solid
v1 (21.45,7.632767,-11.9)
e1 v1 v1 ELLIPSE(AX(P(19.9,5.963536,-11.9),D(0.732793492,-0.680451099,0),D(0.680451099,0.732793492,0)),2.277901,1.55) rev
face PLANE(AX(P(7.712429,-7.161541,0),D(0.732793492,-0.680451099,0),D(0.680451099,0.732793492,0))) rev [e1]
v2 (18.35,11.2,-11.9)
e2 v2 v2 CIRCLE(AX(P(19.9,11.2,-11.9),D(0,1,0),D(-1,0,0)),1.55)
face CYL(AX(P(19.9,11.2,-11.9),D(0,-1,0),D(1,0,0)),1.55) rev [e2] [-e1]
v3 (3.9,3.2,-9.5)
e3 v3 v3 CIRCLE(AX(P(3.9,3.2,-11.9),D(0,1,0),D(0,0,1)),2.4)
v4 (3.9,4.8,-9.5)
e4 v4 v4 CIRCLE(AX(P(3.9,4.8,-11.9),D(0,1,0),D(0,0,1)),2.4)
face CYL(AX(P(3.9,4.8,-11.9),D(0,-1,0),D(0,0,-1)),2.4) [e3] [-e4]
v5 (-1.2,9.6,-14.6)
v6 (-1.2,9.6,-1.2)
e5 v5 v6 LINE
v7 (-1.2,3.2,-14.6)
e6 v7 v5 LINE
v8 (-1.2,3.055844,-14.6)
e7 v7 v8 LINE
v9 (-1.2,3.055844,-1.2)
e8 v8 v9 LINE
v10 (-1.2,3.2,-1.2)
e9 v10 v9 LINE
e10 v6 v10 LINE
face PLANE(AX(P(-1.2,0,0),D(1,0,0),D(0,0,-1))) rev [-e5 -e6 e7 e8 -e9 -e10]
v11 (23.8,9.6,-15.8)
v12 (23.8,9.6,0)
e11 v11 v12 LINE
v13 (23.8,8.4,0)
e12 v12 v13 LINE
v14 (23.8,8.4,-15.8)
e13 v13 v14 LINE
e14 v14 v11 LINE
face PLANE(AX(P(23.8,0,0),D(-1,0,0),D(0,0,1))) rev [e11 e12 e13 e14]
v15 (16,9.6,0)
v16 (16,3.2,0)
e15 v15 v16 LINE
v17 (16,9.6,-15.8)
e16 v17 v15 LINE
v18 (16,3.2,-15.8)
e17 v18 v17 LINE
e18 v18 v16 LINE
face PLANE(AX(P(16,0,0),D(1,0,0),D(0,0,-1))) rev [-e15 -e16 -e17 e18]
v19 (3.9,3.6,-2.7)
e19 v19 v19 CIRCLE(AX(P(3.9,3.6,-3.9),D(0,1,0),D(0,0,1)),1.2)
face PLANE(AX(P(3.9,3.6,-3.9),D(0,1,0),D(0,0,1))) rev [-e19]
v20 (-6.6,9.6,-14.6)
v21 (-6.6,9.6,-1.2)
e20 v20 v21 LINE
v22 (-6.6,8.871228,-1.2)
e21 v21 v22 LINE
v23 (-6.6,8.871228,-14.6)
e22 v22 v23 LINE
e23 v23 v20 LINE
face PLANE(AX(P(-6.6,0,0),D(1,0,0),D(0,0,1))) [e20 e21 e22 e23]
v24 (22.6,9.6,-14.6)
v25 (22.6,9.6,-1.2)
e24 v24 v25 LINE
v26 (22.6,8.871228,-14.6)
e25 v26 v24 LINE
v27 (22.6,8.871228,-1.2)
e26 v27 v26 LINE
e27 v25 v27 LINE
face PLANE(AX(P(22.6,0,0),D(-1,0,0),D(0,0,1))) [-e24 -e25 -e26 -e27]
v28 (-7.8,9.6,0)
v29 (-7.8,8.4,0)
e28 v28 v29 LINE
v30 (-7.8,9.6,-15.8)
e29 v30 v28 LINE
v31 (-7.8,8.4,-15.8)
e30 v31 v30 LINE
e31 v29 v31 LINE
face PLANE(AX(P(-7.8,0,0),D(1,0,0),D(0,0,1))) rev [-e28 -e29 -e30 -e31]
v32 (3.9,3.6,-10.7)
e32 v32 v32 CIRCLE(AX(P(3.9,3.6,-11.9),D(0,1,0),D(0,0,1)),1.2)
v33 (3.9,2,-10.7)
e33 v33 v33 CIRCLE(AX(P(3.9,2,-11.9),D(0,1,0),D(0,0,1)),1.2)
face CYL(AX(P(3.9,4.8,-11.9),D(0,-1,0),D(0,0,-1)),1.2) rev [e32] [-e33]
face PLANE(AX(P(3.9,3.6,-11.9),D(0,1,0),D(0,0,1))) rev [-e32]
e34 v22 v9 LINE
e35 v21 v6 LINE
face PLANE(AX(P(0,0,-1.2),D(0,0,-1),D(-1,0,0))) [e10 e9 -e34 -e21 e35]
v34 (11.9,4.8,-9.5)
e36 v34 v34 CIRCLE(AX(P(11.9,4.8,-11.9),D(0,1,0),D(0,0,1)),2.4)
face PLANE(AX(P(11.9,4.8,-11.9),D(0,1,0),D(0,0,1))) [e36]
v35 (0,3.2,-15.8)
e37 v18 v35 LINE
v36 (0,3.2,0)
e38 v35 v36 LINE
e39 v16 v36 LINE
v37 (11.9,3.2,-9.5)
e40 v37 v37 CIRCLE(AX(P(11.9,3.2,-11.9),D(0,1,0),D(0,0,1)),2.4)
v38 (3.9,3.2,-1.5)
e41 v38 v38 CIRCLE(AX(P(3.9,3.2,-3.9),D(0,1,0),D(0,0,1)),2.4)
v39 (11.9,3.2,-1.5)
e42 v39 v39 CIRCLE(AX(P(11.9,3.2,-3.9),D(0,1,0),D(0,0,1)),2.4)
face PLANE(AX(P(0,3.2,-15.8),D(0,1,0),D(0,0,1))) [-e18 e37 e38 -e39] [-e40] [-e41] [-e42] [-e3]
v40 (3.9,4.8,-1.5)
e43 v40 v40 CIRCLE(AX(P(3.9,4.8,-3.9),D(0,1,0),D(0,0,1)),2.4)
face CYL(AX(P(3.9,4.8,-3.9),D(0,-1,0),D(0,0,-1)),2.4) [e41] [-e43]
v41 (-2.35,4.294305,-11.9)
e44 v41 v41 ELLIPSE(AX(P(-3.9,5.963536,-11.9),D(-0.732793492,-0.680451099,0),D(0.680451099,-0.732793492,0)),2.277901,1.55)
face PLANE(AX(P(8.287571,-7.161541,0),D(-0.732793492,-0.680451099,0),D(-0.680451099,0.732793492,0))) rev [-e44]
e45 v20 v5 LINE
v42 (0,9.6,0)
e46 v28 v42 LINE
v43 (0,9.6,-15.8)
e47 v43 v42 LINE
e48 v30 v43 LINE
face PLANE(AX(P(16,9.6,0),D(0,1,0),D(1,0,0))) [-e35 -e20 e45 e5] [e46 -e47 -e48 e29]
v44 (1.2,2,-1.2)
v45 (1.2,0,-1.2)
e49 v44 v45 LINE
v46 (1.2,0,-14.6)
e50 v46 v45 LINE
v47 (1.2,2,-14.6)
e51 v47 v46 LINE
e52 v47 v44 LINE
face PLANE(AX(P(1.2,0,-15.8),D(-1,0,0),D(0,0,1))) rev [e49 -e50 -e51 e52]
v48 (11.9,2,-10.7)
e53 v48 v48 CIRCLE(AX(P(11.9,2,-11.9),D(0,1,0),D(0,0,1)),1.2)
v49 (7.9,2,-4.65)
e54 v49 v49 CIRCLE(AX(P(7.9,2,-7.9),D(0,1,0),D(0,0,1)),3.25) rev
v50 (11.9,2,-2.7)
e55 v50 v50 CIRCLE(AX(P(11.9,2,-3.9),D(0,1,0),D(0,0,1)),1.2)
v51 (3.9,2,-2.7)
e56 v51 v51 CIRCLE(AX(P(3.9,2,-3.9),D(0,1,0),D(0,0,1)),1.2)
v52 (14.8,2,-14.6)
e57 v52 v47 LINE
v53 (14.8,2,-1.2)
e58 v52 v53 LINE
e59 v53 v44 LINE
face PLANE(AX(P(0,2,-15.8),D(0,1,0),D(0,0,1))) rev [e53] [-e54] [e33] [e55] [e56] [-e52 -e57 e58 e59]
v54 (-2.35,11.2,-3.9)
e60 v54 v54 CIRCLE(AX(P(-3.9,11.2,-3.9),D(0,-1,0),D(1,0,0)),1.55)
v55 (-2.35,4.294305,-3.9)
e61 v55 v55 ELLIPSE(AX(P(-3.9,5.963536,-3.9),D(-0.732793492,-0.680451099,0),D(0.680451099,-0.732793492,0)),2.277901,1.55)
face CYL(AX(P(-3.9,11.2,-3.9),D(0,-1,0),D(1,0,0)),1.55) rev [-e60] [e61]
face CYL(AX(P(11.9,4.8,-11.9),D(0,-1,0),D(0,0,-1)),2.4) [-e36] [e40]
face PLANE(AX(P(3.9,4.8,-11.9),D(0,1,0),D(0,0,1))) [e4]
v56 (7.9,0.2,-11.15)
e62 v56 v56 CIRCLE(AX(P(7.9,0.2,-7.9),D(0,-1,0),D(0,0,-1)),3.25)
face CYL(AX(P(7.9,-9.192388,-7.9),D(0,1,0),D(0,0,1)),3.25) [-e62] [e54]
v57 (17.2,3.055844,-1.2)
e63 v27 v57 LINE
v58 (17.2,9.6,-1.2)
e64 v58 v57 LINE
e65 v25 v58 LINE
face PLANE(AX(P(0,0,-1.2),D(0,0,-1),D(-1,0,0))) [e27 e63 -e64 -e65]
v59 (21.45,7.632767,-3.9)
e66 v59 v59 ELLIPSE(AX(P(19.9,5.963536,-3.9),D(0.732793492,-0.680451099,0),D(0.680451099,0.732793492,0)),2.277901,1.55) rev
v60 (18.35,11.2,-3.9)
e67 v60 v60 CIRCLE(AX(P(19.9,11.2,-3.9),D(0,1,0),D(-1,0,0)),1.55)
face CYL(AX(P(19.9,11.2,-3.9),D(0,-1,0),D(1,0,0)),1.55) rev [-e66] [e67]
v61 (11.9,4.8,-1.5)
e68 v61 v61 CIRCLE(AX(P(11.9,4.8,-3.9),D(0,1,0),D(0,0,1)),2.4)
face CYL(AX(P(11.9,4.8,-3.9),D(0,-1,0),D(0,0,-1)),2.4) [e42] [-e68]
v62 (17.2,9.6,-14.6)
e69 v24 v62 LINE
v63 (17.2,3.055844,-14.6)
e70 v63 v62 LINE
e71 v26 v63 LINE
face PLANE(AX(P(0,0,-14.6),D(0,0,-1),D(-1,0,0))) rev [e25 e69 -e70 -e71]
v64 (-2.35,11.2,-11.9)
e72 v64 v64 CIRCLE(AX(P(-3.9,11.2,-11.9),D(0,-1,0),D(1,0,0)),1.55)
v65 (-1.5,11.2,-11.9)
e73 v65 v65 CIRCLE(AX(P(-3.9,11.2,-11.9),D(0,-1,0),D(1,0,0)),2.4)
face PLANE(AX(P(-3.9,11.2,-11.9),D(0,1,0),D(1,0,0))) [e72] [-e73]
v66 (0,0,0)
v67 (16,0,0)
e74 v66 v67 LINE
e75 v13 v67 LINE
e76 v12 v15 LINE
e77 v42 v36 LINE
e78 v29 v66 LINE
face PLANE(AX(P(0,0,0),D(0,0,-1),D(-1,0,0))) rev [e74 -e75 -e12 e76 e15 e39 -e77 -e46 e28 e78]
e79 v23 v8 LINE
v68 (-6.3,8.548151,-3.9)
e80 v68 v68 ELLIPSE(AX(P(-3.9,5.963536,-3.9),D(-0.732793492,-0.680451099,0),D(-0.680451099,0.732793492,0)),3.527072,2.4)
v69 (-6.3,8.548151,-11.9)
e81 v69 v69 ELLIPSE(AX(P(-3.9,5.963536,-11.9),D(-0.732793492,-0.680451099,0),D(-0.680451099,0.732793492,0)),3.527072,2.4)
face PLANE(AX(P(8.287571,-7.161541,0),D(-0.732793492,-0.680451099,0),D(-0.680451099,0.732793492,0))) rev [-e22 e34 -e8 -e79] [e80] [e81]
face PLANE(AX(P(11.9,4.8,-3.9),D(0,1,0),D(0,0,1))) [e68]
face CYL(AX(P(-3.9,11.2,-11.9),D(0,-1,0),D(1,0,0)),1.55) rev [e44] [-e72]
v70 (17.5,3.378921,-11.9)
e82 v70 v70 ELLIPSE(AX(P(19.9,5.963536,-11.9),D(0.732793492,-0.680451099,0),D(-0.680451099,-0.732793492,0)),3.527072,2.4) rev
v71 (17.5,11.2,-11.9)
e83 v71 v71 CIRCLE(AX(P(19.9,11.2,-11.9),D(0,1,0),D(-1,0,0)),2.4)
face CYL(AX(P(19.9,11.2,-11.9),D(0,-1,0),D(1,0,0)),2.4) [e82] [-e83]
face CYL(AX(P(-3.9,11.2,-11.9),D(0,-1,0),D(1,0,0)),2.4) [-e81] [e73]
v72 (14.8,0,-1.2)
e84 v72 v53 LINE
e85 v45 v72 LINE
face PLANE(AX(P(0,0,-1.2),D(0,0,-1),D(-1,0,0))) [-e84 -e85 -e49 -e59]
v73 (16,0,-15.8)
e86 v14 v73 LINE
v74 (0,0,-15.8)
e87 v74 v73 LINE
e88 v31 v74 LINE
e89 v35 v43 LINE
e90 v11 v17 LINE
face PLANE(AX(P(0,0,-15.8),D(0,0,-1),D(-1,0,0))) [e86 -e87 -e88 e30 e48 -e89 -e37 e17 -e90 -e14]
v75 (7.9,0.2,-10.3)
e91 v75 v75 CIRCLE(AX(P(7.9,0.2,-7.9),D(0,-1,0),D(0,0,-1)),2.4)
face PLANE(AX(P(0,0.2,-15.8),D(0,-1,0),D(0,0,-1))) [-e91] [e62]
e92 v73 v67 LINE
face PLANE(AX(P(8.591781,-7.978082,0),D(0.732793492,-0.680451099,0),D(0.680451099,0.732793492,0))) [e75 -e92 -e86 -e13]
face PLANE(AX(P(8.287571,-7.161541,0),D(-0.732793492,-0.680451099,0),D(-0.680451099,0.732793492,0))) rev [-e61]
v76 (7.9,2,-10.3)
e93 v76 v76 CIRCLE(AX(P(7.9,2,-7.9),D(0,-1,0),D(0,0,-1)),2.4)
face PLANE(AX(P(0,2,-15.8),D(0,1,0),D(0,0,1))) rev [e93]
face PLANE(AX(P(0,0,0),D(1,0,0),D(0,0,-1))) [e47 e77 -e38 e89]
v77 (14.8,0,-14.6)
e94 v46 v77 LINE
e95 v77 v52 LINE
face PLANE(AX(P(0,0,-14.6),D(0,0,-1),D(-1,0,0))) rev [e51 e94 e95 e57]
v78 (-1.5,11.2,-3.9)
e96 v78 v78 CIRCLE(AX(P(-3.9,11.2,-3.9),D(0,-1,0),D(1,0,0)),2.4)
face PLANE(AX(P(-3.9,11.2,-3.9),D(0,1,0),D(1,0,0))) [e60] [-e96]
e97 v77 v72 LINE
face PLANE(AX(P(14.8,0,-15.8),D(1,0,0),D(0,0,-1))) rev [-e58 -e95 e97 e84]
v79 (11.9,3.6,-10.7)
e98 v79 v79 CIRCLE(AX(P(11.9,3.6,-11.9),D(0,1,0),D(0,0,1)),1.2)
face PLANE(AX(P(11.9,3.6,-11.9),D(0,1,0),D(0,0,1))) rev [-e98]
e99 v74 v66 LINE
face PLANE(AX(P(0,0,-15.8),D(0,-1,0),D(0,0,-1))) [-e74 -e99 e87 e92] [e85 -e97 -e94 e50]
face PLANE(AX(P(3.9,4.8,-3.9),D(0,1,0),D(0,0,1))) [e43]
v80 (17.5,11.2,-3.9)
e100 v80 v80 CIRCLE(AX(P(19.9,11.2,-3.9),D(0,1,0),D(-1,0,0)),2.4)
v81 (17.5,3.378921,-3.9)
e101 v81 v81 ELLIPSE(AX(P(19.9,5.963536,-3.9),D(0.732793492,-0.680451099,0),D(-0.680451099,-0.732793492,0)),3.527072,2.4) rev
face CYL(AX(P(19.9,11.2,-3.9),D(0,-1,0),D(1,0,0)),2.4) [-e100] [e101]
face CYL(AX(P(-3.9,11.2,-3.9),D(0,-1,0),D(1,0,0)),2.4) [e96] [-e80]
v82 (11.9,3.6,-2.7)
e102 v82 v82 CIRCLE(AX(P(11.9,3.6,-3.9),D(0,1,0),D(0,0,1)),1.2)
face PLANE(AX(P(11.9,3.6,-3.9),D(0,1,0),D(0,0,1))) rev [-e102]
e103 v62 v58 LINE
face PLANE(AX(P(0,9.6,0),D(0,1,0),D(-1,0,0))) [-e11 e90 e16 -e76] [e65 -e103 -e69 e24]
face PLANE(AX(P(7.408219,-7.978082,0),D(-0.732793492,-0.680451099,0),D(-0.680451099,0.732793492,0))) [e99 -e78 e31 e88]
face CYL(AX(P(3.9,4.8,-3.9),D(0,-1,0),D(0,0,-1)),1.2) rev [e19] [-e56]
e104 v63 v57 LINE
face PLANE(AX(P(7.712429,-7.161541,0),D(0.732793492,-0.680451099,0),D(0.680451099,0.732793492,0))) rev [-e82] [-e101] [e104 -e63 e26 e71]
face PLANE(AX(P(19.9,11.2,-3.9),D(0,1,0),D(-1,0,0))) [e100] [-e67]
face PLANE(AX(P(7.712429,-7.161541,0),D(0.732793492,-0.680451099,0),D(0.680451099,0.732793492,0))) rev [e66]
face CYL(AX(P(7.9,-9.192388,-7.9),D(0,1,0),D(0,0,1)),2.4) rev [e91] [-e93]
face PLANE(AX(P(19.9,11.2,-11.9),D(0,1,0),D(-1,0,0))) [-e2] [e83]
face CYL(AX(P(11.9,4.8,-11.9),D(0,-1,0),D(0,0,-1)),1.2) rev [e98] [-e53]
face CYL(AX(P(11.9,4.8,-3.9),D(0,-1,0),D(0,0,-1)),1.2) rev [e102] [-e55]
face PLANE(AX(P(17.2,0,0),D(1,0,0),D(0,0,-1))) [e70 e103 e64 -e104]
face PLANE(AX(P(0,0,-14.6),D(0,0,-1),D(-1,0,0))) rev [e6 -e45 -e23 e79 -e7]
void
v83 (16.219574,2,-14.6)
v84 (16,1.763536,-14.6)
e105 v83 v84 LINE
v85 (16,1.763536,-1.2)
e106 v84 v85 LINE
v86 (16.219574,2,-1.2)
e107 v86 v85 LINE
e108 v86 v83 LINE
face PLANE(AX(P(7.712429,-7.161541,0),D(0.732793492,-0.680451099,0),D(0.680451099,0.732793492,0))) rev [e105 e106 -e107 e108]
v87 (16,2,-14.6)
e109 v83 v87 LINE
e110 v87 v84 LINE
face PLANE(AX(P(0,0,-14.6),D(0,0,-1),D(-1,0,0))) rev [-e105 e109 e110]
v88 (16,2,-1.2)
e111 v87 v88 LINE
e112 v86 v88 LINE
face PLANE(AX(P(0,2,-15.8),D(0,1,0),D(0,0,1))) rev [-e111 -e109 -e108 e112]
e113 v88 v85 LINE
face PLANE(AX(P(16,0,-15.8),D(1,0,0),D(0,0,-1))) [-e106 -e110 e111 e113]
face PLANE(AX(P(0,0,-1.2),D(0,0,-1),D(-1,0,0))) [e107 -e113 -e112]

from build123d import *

# Parameters (mm, degrees)
SKETCH1_W                       = 16
SKETCH1_H                       = 3.2
BOSS_EXTRUDE1_DEPTH             = 15.8
SKETCH2_R                       = 2.4
BOSS_EXTRUDE2_DEPTH             = 1.6
LPATTERN1_COUNT                 = 2
LPATTERN1_PITCH                 = 8
LPATTERN1_COUNT_DIR2            = 6
LPATTERN1_PITCH_DIR2            = 8
SHELL1_T                        = -1.2
SKETCH3_R                       = 3.25
SKETCH3_R_2                     = 2.4
BOSS_EXTRUDE3_DEPTH             = 1.8
SHELL2_START                    = -14.6
SHELL2_DEPTH                    = 13.4
BOSS_EXTRUDE4_REACH             = 32.137
SKETCH11_R                      = 2.4
SKETCH11_R_2                    = 1.55
BOSS_EXTRUDE4_DIRECTION_2_DEPTH = 1.6
SHELL6_T                        = -1.2


# Read off the part's stored shape, not the designer's step: Shell2
with BuildPart() as part:
    # Sketch1 → Boss-Extrude1 (new body)
    with BuildSketch(Plane.XY):
        with Locations((8, 1.6)):
            Rectangle(SKETCH1_W, SKETCH1_H)
    extrude(amount=-BOSS_EXTRUDE1_DEPTH)

    # Sketch2 → Boss-Extrude2 (add)
    with BuildSketch(Plane(origin=(0, 3.2, 0), x_dir=(1, 0, 0), z_dir=(0, 1, 0))):
        with Locations(Location((3.9, 3.9, 0), (0, 0, 270))):
            Circle(SKETCH2_R)
    boss_extrude2 = extrude(amount=BOSS_EXTRUDE2_DEPTH)

    # LPattern1: Boss-Extrude2 2 × 6, 8 skipped
    with Locations(*[(j * LPATTERN1_PITCH_DIR2, 0, -i * LPATTERN1_PITCH) for i in range(LPATTERN1_COUNT) for j in range(LPATTERN1_COUNT_DIR2) if (i, j) not in ((0, 0), (0, 2), (0, 3), (0, 4), (0, 5), (1, 2), (1, 3), (1, 4), (1, 5))]):
        add(boss_extrude2)

    # Shell1
    shell1_openings = [part.faces().sort_by_distance(p)[0] for p in [
        (8, 0, -7.9),
    ]]
    offset(amount=SHELL1_T, openings=shell1_openings, kind=Kind.INTERSECTION)

    # Sketch3 → Boss-Extrude3 (add)
    with BuildSketch(Plane.XZ.offset(-2)):
        with Locations(Location((7.9, -7.9, 0), (0, 0, 90))):
            Circle(SKETCH3_R)
        with Locations(Location((7.9, -7.9, 0), (0, 0, 270))):
            Circle(SKETCH3_R_2, mode=Mode.SUBTRACT)
    extrude(amount=BOSS_EXTRUDE3_DEPTH)

    # Sketch7 → Loft1 section 0
    with BuildSketch(Plane(origin=(23.8, 0, 0), x_dir=(0, 0, -1), z_dir=(1, 0, 0))):
        with BuildLine():
            Line((15.8, 9.6), (15.8, 8.4))
            Line((15.8, 8.4), (0, 8.4))
            Line((0, 8.4), (0, 9.6))
            Line((0, 9.6), (15.8, 9.6))
        make_face()
    # Sketch5 → Loft1 section 1
    with BuildSketch(Plane(origin=(16, 0, 0), x_dir=(0, 0, -1), z_dir=(1, 0, 0))):
        with BuildLine():
            Line((0, 0), (0, 9.6))
            Line((0, 9.6), (15.8, 9.6))
            Line((15.8, 9.6), (15.8, 0))
            Line((15.8, 0), (0, 0))
        make_face()
    loft1 = loft()

    # Shell2 outline → Shell2 (cut)
    with BuildSketch(Plane.XY.offset(SHELL2_START)):
        Polygon((16, 1.763535985), (16.219573728, 2), (16, 2), align=None)
        Polygon((17.2, 9.6), (17.2, 3.055843678), (22.6, 8.871228293), (22.6, 9.6), align=None)
    extrude(amount=SHELL2_DEPTH, mode=Mode.SUBTRACT)

    # Sketch11 → Boss-Extrude4 (add, up to next)
    with BuildSketch(Plane(origin=(0, 9.6, 0), x_dir=(1, 0, 0), z_dir=(0, 1, 0)), mode=Mode.PRIVATE) as boss_extrude4_sk1:
        with Locations(Location((19.9, 11.9, 0), (0, 0, 180))):
            Circle(SKETCH11_R)
        with Locations((19.9, 11.9)):
            Circle(SKETCH11_R_2, mode=Mode.SUBTRACT)
    boss_extrude4_tool1 = extrude(boss_extrude4_sk1.sketch, amount=-BOSS_EXTRUDE4_REACH, mode=Mode.PRIVATE) - part.part
    # Sketch11 → Boss-Extrude4 (add, up to next)
    with BuildSketch(Plane(origin=(0, 9.6, 0), x_dir=(1, 0, 0), z_dir=(0, 1, 0)), mode=Mode.PRIVATE) as boss_extrude4_sk2:
        with Locations(Location((19.9, 3.9, 0), (0, 0, 180))):
            Circle(SKETCH11_R)
        with Locations((19.9, 3.9)):
            Circle(SKETCH11_R_2, mode=Mode.SUBTRACT)
    boss_extrude4_tool2 = extrude(boss_extrude4_sk2.sketch, amount=-BOSS_EXTRUDE4_REACH, mode=Mode.PRIVATE) - part.part
    boss_extrude4_1 = boss_extrude4_tool1.solids().sort_by_distance((22.232118, 9.6, -11.9))[0]
    add(boss_extrude4_1)
    boss_extrude4_2 = boss_extrude4_tool2.solids().sort_by_distance((22.232118, 9.6, -3.9))[0]
    add(boss_extrude4_2)
    boss_extrude4 = boss_extrude4_1 + boss_extrude4_2  # Boss-Extrude4 as one shape, for the pattern or mirror that repeats it

    # Sketch11 → Boss-Extrude4 direction 2 (add)
    # profile 1 of 2: a face of its own
    with BuildSketch(Plane(origin=(0, 9.6, 0), x_dir=(1, 0, 0), z_dir=(0, 1, 0))):
        with Locations(Location((19.9, 11.9, 0), (0, 0, 180))):
            Circle(SKETCH11_R)
        with Locations((19.9, 11.9)):
            Circle(SKETCH11_R_2, mode=Mode.SUBTRACT)
    # profile 2 of 2: a face of its own
    with BuildSketch(Plane(origin=(0, 9.6, 0), x_dir=(1, 0, 0), z_dir=(0, 1, 0))):
        with Locations(Location((19.9, 3.9, 0), (0, 0, 180))):
            Circle(SKETCH11_R)
        with Locations((19.9, 3.9)):
            Circle(SKETCH11_R_2, mode=Mode.SUBTRACT)
    boss_extrude4_direction_2 = extrude(amount=BOSS_EXTRUDE4_DIRECTION_2_DEPTH)

    # Mirror1: Loft1 across plane
    add(loft1.mirror(Plane(origin=(8, 0, 0), x_dir=(0, 0, 1), z_dir=(1, 0, 0))))


with BuildPart() as body_2:
    # Split1: the piece on the far side of the plane
    add(part.part)
    split(bisect_by=Plane(origin=(0, 0, 0), x_dir=(0, 0, 1), z_dir=(1, 0, 0)), keep=Keep.BOTTOM)

    # Shell6
    shell6_openings = [body_2.faces().sort_by_distance(p)[0] for p in [
        (-3.9, 9.6, -7.9),
    ]]
    offset(amount=SHELL6_T, openings=shell6_openings, kind=Kind.INTERSECTION)


with BuildPart() as part_1:
    add(part.part)

    # Split1
    split(bisect_by=Plane(origin=(0, 0, 0), x_dir=(0, 0, 1), z_dir=(1, 0, 0)), keep=Keep.TOP)


with BuildPart() as body_2_1:
    add(body_2.part)

    # Combine1: union part
    add(part_1.part)

    # Mirror4: Boss-Extrude4, Boss-Extrude4 direction 2 across plane
    add(boss_extrude4.mirror(Plane(origin=(8, 0, 0), x_dir=(0, 0, 1), z_dir=(1, 0, 0))))
    add(boss_extrude4_direction_2.mirror(Plane(origin=(8, 0, 0), x_dir=(0, 0, 1), z_dir=(1, 0, 0))))


solid = body_2_1.part
